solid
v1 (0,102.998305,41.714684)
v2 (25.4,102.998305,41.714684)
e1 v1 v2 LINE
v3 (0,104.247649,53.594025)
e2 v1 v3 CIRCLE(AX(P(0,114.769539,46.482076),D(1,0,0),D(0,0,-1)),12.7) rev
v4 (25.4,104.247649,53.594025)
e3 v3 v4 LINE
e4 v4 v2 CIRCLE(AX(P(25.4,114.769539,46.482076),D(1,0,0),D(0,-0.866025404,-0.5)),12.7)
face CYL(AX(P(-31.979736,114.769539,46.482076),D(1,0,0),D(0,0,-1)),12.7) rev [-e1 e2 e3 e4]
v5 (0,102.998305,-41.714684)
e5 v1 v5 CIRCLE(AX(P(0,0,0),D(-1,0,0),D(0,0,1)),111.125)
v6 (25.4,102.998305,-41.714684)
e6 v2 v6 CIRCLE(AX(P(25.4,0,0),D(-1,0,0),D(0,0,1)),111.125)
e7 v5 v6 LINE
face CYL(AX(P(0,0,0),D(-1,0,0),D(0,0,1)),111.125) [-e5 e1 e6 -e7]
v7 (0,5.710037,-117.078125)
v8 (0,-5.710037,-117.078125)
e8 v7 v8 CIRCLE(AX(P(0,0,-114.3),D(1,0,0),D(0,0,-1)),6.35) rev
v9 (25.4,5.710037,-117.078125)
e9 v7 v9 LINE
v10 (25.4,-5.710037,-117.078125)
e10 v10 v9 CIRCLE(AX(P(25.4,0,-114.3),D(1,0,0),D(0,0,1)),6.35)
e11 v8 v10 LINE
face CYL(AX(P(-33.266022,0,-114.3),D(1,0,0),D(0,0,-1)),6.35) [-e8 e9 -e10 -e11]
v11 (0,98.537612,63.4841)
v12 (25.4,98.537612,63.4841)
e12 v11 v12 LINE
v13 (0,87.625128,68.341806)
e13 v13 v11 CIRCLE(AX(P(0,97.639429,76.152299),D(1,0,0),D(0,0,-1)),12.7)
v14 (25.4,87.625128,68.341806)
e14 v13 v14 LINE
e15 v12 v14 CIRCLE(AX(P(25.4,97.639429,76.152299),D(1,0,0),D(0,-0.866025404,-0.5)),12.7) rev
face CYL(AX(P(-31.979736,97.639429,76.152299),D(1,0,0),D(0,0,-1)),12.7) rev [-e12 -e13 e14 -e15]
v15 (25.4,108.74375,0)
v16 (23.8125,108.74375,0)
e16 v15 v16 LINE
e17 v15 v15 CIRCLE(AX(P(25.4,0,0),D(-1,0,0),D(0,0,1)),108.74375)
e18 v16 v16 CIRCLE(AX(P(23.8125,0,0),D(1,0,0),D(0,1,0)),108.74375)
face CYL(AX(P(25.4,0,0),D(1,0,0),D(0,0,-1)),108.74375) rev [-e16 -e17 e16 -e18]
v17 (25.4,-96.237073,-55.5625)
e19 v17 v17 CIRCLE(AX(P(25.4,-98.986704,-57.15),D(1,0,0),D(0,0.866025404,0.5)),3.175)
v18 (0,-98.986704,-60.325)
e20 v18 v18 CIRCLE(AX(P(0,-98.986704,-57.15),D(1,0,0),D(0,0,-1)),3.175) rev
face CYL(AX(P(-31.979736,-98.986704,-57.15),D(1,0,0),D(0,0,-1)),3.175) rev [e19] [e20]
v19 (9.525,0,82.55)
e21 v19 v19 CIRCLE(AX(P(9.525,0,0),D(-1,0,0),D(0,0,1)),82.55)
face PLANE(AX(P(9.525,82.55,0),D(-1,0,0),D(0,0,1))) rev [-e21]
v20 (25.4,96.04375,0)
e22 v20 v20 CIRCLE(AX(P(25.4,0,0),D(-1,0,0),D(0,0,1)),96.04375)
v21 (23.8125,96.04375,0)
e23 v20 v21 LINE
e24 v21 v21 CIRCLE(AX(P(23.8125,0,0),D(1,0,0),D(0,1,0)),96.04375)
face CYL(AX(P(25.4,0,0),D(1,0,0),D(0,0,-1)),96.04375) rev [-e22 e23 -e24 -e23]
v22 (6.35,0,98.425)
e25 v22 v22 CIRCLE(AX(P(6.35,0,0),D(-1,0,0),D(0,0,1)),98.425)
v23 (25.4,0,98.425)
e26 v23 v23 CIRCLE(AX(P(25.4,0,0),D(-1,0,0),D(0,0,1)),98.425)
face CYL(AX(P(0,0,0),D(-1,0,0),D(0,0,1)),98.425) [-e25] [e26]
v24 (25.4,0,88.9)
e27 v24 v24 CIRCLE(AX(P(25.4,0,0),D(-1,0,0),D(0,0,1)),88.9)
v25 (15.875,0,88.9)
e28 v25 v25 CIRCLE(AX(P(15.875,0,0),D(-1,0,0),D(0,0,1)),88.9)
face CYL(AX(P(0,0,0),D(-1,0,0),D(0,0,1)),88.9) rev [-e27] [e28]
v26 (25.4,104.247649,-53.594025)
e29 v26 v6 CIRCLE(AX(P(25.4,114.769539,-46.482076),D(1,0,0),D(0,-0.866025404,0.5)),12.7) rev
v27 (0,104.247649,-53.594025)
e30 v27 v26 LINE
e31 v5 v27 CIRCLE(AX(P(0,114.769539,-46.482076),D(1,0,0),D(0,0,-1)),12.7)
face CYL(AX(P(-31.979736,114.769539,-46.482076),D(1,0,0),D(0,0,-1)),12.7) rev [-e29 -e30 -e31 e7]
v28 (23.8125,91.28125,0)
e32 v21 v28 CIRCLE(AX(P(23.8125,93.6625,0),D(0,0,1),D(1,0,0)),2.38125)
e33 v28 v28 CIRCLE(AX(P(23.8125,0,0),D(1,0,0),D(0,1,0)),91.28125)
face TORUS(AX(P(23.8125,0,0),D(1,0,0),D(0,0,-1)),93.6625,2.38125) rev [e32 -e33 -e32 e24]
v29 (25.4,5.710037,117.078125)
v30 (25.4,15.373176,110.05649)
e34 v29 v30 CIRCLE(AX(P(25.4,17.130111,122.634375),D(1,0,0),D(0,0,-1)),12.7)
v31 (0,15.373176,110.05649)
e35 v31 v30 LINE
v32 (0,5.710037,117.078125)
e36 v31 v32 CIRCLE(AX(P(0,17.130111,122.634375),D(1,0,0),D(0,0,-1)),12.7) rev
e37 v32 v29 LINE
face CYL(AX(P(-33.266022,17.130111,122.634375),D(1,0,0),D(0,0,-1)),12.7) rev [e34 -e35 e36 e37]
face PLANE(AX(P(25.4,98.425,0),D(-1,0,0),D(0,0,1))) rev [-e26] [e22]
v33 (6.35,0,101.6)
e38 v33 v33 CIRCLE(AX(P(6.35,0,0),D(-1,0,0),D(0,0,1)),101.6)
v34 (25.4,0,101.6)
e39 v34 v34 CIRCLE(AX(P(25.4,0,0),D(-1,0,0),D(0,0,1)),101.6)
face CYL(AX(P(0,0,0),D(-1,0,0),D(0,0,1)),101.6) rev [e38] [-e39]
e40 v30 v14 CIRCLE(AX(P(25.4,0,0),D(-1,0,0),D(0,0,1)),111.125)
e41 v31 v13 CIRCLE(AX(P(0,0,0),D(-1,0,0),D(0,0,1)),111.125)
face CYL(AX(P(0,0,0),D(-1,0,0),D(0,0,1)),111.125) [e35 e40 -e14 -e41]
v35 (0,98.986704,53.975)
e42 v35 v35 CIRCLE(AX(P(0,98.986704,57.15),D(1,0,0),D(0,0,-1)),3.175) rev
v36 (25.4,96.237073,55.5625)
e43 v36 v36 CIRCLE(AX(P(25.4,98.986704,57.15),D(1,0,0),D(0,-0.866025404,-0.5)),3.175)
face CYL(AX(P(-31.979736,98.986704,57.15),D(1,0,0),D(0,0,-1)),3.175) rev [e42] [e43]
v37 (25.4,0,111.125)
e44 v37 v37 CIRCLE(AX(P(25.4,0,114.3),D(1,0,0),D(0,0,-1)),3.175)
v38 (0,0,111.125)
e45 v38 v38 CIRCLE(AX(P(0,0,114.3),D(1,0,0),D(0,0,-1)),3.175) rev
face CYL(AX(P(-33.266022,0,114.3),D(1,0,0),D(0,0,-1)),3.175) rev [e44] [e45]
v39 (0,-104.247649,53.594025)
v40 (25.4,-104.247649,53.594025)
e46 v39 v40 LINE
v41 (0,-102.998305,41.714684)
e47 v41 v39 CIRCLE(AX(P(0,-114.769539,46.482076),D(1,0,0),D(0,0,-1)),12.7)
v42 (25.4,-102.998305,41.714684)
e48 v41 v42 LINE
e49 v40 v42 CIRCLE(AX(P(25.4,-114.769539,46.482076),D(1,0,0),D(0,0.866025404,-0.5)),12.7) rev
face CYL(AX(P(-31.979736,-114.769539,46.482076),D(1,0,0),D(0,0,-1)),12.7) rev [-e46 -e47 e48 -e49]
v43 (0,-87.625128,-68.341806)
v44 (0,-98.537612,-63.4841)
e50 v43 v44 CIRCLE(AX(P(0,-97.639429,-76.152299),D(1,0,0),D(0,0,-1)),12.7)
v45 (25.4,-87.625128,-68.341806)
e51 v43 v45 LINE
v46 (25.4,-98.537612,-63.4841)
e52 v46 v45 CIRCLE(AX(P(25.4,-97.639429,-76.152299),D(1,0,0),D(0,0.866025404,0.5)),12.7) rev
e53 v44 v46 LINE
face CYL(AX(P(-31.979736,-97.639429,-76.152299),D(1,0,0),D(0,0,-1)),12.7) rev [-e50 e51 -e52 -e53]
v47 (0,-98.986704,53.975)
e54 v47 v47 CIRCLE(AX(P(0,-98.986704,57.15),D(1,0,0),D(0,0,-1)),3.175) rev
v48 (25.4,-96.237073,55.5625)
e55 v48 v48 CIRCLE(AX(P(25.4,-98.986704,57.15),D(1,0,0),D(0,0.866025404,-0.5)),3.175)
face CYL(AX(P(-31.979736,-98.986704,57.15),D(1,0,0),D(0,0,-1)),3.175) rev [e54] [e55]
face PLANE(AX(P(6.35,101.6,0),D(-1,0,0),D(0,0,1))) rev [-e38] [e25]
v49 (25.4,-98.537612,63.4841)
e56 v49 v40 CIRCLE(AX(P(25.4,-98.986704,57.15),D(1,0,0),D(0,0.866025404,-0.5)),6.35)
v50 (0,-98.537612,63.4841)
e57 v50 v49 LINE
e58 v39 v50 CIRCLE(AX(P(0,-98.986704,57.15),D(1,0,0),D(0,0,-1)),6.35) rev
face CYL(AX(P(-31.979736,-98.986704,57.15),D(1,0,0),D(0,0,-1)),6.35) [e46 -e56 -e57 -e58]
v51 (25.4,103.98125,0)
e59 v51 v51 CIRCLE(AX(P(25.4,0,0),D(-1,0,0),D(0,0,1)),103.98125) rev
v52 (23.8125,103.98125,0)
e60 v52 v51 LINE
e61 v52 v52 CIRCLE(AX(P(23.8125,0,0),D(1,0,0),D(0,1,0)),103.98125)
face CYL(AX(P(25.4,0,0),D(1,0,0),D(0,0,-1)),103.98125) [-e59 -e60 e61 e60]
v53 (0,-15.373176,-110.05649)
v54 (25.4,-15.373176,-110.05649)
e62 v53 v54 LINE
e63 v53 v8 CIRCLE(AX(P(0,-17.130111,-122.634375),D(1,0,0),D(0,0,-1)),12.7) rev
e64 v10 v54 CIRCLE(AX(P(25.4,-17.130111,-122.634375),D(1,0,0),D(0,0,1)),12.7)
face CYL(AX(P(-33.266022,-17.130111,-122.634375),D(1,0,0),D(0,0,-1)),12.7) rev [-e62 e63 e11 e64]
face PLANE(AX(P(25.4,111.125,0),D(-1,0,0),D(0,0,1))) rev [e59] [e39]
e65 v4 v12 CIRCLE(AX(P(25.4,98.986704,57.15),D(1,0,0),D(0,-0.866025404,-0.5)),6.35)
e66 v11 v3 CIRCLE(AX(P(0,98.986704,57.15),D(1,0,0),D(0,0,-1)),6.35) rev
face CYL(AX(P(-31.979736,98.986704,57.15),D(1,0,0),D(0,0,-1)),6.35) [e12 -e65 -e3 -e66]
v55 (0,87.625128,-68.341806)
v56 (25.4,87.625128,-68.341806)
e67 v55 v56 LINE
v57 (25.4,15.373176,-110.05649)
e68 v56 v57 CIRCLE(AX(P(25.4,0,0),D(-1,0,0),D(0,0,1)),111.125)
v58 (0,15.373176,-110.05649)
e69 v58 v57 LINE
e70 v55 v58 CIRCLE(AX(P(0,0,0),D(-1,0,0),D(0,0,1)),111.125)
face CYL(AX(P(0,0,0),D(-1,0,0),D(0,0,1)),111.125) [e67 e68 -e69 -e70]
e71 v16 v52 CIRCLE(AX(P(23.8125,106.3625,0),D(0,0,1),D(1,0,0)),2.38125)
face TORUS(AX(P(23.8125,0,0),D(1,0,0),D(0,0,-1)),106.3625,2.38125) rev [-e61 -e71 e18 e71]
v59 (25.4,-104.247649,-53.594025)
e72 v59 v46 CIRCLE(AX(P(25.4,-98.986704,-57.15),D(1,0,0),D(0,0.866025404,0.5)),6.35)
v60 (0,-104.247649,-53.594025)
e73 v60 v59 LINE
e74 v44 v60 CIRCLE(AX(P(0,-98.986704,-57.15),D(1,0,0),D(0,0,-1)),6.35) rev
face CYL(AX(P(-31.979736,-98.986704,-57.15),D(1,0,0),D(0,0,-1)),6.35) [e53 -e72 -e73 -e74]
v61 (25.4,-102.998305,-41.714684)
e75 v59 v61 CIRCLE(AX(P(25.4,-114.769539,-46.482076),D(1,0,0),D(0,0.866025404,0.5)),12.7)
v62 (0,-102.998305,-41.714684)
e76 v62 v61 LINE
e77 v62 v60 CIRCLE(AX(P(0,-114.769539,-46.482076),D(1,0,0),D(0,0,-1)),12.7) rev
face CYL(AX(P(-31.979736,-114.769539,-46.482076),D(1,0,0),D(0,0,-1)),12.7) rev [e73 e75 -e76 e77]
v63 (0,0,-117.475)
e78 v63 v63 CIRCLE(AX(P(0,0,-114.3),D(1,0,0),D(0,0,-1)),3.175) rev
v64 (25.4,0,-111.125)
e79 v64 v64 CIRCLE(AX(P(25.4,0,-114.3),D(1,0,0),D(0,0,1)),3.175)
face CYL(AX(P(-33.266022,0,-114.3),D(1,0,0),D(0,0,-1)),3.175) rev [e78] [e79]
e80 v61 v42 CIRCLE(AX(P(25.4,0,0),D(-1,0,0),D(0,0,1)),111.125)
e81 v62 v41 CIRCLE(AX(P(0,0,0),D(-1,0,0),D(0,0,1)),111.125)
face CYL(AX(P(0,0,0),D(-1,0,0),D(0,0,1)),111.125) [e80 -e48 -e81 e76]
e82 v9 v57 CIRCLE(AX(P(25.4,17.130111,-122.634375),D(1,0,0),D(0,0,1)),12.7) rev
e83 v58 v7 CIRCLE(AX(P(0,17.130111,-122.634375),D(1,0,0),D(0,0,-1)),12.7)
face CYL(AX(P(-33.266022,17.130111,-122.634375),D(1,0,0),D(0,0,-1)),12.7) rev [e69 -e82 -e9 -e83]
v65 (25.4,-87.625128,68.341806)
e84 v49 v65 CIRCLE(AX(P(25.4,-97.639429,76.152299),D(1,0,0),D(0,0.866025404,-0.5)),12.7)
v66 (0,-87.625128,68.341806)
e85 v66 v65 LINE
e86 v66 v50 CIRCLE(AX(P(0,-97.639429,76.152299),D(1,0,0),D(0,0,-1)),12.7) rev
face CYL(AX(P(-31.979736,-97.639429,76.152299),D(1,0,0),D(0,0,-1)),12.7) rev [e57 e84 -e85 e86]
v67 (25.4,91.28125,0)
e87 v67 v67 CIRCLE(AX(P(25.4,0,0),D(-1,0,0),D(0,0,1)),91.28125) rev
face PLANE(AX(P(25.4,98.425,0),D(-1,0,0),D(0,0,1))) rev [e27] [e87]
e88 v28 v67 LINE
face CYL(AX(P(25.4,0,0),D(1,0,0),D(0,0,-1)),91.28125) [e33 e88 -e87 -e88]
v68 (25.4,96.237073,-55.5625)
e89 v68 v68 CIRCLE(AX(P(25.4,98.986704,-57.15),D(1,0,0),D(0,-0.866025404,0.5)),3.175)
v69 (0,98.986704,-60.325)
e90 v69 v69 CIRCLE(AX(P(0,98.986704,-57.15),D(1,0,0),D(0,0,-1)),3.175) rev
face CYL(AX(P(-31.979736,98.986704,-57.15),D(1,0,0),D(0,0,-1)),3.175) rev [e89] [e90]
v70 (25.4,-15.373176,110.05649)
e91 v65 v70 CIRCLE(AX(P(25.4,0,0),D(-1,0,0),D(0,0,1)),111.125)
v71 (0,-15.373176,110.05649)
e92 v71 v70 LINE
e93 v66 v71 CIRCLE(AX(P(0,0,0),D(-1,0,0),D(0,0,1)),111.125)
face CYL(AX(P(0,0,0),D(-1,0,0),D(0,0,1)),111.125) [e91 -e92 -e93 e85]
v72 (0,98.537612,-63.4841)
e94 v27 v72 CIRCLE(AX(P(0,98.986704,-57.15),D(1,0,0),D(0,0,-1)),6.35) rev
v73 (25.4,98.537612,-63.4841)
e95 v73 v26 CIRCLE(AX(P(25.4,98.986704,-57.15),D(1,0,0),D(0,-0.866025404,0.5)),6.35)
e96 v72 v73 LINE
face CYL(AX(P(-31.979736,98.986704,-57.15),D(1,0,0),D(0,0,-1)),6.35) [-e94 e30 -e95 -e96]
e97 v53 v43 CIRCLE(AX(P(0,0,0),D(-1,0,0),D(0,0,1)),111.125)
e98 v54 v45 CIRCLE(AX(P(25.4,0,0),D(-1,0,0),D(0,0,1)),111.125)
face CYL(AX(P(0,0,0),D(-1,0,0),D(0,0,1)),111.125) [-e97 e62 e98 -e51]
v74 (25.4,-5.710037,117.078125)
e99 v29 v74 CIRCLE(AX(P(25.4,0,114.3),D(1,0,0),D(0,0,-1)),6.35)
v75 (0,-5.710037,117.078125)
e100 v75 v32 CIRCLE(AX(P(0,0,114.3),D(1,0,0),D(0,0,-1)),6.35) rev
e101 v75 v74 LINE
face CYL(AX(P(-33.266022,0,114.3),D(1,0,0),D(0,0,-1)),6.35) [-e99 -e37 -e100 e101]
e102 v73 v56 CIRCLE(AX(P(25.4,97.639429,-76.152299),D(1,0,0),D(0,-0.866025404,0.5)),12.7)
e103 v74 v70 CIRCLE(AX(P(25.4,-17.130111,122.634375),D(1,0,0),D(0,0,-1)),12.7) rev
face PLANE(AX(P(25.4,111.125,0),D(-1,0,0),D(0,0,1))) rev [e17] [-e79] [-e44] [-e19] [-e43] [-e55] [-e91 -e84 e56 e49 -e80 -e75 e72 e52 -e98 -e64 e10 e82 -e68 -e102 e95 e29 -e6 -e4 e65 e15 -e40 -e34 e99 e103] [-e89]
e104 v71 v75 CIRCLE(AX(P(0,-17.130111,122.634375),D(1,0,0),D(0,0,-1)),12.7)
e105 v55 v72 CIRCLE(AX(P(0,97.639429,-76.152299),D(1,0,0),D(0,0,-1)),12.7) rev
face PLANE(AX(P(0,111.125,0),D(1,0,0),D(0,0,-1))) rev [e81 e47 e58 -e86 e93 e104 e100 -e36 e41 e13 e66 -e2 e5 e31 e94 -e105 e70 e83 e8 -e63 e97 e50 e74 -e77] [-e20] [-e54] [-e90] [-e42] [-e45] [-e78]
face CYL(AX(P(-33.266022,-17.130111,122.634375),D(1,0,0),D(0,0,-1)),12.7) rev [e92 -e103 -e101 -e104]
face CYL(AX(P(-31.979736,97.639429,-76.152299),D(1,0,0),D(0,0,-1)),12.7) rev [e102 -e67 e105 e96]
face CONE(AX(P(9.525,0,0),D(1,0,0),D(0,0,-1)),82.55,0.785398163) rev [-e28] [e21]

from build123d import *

# Parameters (mm, degrees)
BOSS_EXTRUDE1_START     = -25.4
SKETCH3_R               = 3.175
BOSS_EXTRUDE1_DEPTH     = 25.4
CIRPATTERN1_OUTLINE_R   = 3.175
CIRPATTERN1_OUTLINE_R_2 = 101.6
CIRPATTERN1_DEPTH       = 25.4


with BuildPart() as part:
    # Sketch1 → Revolve1 (revolve)
    with BuildSketch(Plane.XY, mode=Mode.PRIVATE) as revolve1_sk:
        Polygon((0, 111.125), (0, 0), (9.525, 0), (9.525, 82.55), (15.875, 88.9), (25.4, 88.9), (25.4, 98.425), (6.35, 98.425), (6.35, 101.6), (25.4, 101.6), (25.4, 111.125), align=None)
    revolve(revolve1_sk.sketch.rotate(Axis((0, 0, 0), (1, 0, 0)), 90), axis=Axis((0, 0, 0), (1, 0, 0)))

    # Sketch3 → Boss-Extrude1 (add)
    # profile 1 of 3: a face of its own
    with BuildSketch(Plane(origin=(25.4, 0, 0), x_dir=(0, 0, -1), z_dir=(1, 0, 0)).offset(BOSS_EXTRUDE1_START)):
        with BuildLine():
            ThreePointArc((-110.992708333, 5.420730747), (-113.998455884, 6.342836207), (-117.078125, 5.710036907))
            ThreePointArc((-117.078125, 5.710036907), (-120.65, 0), (-117.078125, -5.710036907))
            ThreePointArc((-117.078125, -5.710036907), (-113.998455884, -6.342836207), (-110.992708333, -5.420730747))
            ThreePointArc((-110.992708333, -5.420730747), (-111.09192216, -2.71117239), (-111.125, 0))
            ThreePointArc((-111.125, 0), (-111.09192216, 2.71117239), (-110.992708333, 5.420730747))
        make_face()
        with Locations((-114.3, 0)):
            Circle(SKETCH3_R, mode=Mode.SUBTRACT)
    # profile 2 of 3: a face of its own
    with BuildSketch(Plane(origin=(25.4, 0, 0), x_dir=(0, 0, -1), z_dir=(1, 0, 0)).offset(BOSS_EXTRUDE1_START)):
        with BuildLine():
            ThreePointArc((-110.056490385, 15.373176289), (-112.36034097, 9.664574924), (-117.078125, 5.710036907))
            ThreePointArc((-117.078125, 5.710036907), (-113.998455884, 6.342836207), (-110.992708333, 5.420730747))
            ThreePointArc((-110.992708333, 5.420730747), (-110.636566543, 10.407486174), (-110.056490385, 15.373176289))
        make_face()
    # profile 3 of 3: a face of its own
    with BuildSketch(Plane(origin=(25.4, 0, 0), x_dir=(0, 0, -1), z_dir=(1, 0, 0)).offset(BOSS_EXTRUDE1_START)):
        with BuildLine():
            ThreePointArc((-110.992708333, -5.420730747), (-113.998455884, -6.342836207), (-117.078125, -5.710036907))
            ThreePointArc((-117.078125, -5.710036907), (-112.36034097, -9.664574924), (-110.056490385, -15.373176289))
            ThreePointArc((-110.056490385, -15.373176289), (-110.636566543, -10.407486174), (-110.992708333, -5.420730747))
        make_face()
    extrude(amount=BOSS_EXTRUDE1_DEPTH)

    # CirPattern1: read off the stored shape, not the designer's step
    # CirPattern1 outline → CirPattern1 (add)
    with BuildSketch(Plane.YZ):
        with BuildLine():
            ThreePointArc((-5.710036907, 117.078125), (-9.664574924, 112.36034097), (-15.373176289, 110.056490385))
            ThreePointArc((-15.373176289, 110.056490385), (-55.5625, 96.237072996), (-87.62512838, 68.341806396))
            ThreePointArc((-87.62512838, 68.341806396), (-92.474622196, 64.549937886), (-98.537612024, 63.484099518))
            ThreePointArc((-98.537612024, 63.484099518), (-104.485964967, 60.325), (-104.247648931, 53.594025482))
            ThreePointArc((-104.247648931, 53.594025482), (-102.13919712, 47.810403084), (-102.998304669, 41.714683989))
            ThreePointArc((-102.998304669, 41.714683989), (-111.125, 0), (-102.998304669, -41.714683989))
            ThreePointArc((-102.998304669, -41.714683989), (-102.13919712, -47.810403084), (-104.247648931, -53.594025482))
            ThreePointArc((-104.247648931, -53.594025482), (-104.485964967, -60.325), (-98.537612024, -63.484099518))
            ThreePointArc((-98.537612024, -63.484099518), (-92.474622196, -64.549937886), (-87.62512838, -68.341806396))
            ThreePointArc((-87.62512838, -68.341806396), (-55.5625, -96.237072996), (-15.373176289, -110.056490385))
            ThreePointArc((-15.373176289, -110.056490385), (-9.664574924, -112.36034097), (-5.710036907, -117.078125))
            ThreePointArc((-5.710036907, -117.078125), (0, -120.65), (5.710036907, -117.078125))
            ThreePointArc((5.710036907, -117.078125), (9.664574924, -112.36034097), (15.373176289, -110.056490385))
            ThreePointArc((15.373176289, -110.056490385), (55.5625, -96.237072996), (87.62512838, -68.341806396))
            ThreePointArc((87.62512838, -68.341806396), (92.474622196, -64.549937886), (98.537612024, -63.484099518))
            ThreePointArc((98.537612024, -63.484099518), (104.485964967, -60.325), (104.247648931, -53.594025482))
            ThreePointArc((104.247648931, -53.594025482), (102.13919712, -47.810403084), (102.998304669, -41.714683989))
            ThreePointArc((102.998304669, -41.714683989), (111.125, 0), (102.998304669, 41.714683989))
            ThreePointArc((102.998304669, 41.714683989), (102.13919712, 47.810403084), (104.247648931, 53.594025482))
            ThreePointArc((104.247648931, 53.594025482), (104.485964967, 60.325), (98.537612024, 63.484099518))
            ThreePointArc((98.537612024, 63.484099518), (92.474622196, 64.549937886), (87.62512838, 68.341806396))
            ThreePointArc((87.62512838, 68.341806396), (55.5625, 96.237072996), (15.373176289, 110.056490385))
            ThreePointArc((15.373176289, 110.056490385), (9.664574924, 112.36034097), (5.710036907, 117.078125))
            ThreePointArc((5.710036907, 117.078125), (0, 120.65), (-5.710036907, 117.078125))
        make_face()
        with Locations((-98.986703653, -57.15)):
            Circle(CIRPATTERN1_OUTLINE_R, mode=Mode.SUBTRACT)
        with Locations((0, -114.3)):
            Circle(CIRPATTERN1_OUTLINE_R, mode=Mode.SUBTRACT)
        with Locations((98.986703653, -57.15)):
            Circle(CIRPATTERN1_OUTLINE_R, mode=Mode.SUBTRACT)
        with Locations((-98.986703653, 57.15)):
            Circle(CIRPATTERN1_OUTLINE_R, mode=Mode.SUBTRACT)
        Circle(CIRPATTERN1_OUTLINE_R_2, mode=Mode.SUBTRACT)
        with Locations((98.986703653, 57.15)):
            Circle(CIRPATTERN1_OUTLINE_R, mode=Mode.SUBTRACT)
        with Locations((0, 114.3)):
            Circle(CIRPATTERN1_OUTLINE_R, mode=Mode.SUBTRACT)
    extrude(amount=CIRPATTERN1_DEPTH)

    # Cut-Sweep1: sweep along a path in Sketch4
    with BuildLine(Plane(origin=(25.4, 0, 0), x_dir=(0, 0, -1), z_dir=(1, 0, 0))) as cut_sweep1_path:
        CenterArc((0, 0), 106.3625, 0, 360)
    # Sketch6 → Cut-Sweep1 (sweep, cut)
    with BuildSketch(Plane.XY):
        with BuildLine():
            Line((23.8125, 108.74375), (26.19375, 108.74375))
            Line((26.19375, 108.74375), (26.19375, 103.98125))
            Line((26.19375, 103.98125), (23.8125, 103.98125))
            ThreePointArc((23.8125, 103.98125), (21.43125, 106.3625), (23.8125, 108.74375))
        make_face()
        with BuildLine():
            Line((23.8125, 91.28125), (26.19375, 91.28125))
            Line((26.19375, 91.28125), (26.19375, 96.04375))
            Line((26.19375, 96.04375), (23.8125, 96.04375))
            ThreePointArc((23.8125, 96.04375), (21.43125, 93.6625), (23.8125, 91.28125))
        make_face()
    sweep(path=cut_sweep1_path.line, mode=Mode.SUBTRACT)


solid = part.part
